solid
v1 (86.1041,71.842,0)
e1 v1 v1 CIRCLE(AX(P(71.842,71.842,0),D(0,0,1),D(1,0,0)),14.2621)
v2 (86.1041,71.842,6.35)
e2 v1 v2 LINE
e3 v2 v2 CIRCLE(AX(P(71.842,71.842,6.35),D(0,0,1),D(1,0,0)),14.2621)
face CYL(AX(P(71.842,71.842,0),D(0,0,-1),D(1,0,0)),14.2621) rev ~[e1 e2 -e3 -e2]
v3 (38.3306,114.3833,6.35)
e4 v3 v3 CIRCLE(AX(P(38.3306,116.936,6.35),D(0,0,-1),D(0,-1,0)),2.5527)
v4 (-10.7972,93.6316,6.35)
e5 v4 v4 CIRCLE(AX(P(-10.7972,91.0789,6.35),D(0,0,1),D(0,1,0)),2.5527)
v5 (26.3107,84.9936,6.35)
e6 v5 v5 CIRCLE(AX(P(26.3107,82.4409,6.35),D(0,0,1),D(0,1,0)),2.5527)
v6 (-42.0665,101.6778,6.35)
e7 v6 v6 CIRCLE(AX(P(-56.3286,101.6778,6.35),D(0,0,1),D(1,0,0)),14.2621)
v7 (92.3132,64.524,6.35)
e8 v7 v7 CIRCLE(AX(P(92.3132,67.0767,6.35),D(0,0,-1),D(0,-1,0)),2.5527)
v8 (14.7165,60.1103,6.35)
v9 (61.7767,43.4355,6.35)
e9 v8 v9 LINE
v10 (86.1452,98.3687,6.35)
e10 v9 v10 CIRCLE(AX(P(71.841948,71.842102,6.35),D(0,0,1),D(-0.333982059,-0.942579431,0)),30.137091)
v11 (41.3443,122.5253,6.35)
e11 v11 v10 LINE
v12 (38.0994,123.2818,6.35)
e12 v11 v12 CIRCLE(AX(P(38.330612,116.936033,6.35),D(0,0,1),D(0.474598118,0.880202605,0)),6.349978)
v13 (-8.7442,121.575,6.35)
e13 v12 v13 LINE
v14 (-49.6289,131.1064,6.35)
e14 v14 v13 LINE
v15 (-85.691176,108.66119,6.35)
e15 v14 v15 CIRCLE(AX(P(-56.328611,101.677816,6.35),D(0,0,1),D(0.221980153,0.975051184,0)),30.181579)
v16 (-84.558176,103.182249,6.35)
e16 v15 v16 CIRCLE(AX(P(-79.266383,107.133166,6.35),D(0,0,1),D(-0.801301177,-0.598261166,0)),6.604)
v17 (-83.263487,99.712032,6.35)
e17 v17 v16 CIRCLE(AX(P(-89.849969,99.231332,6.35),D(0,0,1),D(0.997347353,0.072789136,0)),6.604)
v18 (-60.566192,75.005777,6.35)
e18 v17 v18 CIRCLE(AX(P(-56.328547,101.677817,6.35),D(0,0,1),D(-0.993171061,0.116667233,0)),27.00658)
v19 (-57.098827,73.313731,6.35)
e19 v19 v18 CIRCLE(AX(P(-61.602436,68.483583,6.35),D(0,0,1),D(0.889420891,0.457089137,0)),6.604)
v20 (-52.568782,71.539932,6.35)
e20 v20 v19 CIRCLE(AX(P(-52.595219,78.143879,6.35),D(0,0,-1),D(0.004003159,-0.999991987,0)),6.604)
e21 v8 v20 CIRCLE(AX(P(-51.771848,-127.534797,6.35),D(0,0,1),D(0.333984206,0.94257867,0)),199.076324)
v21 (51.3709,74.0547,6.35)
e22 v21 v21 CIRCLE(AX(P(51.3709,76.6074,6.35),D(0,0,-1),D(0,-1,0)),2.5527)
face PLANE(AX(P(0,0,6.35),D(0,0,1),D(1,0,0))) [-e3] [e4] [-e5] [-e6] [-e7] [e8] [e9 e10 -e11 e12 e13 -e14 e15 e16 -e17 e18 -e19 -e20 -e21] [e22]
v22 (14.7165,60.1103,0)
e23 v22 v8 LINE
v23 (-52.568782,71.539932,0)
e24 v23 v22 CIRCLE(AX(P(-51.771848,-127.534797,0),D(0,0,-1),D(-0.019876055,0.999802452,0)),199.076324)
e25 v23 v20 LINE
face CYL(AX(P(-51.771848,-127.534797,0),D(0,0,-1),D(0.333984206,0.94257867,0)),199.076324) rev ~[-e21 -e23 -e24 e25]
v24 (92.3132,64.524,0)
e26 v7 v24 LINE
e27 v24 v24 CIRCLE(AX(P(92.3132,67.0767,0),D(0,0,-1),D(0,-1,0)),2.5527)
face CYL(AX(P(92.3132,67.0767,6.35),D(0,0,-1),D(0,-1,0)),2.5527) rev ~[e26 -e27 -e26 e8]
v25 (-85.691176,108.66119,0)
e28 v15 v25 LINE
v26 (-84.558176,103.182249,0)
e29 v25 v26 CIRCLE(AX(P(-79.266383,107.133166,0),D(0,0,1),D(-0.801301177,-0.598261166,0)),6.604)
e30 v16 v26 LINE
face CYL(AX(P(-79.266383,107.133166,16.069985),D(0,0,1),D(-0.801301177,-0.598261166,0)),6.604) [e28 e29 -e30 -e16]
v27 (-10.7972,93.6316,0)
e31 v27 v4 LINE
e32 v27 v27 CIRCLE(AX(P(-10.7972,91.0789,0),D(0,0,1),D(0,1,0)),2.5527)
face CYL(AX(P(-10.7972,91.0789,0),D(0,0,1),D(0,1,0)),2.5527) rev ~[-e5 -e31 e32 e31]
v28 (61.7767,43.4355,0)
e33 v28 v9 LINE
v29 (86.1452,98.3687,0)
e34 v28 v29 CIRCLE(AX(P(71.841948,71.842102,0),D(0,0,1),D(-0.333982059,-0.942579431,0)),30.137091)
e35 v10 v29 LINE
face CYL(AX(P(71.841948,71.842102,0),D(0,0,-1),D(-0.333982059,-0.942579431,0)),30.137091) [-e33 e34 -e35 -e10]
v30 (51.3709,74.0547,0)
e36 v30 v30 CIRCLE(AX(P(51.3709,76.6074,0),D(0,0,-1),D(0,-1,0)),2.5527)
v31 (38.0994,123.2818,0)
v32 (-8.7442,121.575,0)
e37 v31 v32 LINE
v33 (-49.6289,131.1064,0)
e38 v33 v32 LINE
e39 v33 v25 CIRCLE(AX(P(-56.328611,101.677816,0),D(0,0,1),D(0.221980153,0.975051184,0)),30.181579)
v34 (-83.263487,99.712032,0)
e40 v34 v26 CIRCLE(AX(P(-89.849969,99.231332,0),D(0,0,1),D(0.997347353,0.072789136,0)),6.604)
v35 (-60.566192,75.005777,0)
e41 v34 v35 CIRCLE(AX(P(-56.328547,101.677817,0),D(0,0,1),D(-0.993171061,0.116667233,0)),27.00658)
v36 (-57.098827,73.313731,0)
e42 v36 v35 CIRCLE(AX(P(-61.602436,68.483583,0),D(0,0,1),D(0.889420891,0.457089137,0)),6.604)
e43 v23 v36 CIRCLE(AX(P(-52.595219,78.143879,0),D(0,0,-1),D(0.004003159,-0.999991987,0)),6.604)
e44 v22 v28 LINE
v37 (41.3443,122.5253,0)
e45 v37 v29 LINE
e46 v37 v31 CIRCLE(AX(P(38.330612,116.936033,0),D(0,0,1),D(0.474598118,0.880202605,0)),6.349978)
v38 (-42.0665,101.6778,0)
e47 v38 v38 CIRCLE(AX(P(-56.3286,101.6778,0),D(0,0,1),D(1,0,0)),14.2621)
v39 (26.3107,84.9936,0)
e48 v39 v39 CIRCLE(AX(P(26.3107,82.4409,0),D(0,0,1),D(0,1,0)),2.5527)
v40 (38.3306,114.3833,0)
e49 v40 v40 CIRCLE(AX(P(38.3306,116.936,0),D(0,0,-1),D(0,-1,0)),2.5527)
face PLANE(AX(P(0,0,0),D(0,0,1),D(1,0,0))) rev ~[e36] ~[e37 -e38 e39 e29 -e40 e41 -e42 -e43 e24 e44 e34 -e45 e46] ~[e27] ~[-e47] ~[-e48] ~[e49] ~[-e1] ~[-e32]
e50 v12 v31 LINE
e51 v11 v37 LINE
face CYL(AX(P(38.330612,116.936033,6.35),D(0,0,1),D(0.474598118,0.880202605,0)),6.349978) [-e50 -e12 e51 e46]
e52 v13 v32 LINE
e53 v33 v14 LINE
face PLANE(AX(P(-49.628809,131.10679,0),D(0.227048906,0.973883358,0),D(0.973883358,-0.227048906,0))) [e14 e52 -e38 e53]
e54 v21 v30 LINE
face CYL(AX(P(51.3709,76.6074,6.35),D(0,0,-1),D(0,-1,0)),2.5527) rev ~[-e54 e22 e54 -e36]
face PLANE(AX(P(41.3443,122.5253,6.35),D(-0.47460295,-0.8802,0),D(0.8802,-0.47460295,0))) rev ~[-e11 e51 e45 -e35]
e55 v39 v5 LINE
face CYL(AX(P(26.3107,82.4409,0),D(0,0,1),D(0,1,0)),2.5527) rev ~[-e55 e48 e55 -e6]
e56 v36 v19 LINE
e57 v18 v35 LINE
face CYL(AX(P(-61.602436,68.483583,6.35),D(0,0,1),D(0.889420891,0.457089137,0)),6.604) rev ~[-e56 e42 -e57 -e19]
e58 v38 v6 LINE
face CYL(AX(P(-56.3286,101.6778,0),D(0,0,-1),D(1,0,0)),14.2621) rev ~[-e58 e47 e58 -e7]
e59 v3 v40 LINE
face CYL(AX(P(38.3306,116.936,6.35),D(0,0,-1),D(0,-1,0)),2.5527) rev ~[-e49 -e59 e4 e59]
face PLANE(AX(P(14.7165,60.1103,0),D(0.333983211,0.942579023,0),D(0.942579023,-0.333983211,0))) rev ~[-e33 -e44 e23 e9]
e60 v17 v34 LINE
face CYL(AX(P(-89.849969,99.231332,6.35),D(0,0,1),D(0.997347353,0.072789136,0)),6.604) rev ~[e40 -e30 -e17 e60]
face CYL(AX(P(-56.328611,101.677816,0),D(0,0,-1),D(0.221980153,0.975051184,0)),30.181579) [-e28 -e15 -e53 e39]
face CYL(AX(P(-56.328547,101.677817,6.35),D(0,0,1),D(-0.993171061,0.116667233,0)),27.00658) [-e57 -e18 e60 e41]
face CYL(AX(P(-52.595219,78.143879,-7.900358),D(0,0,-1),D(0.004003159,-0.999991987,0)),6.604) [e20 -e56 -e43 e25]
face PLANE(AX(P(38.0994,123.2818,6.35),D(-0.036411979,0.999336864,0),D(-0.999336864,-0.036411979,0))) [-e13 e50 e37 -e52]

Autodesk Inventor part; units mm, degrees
ref_plane "YZ Plane" through (0, 0, 0) normal (1, 0, 0) x (0, 1, 0)
ref_plane "XZ Plane" through (0, 0, 0) normal (0, 1, 0) x (-1, 0, 0)
ref_plane "XY Plane" through (0, 0, 0) normal (0, 0, 1) x (1, 0, 0)
sketch "Sketch1" plane through (0, 0, 0) normal (0, 0, 1) x (1, 0, 0)
  circle A0 centre (71.842, 71.842) radius 50.8 construction
  circle A1 centre (-71.842, -71.842) radius 50.8 construction
  circle A2 centre (0, 0) radius 50.8 construction
  line L0 (-35.921, -35.921) -> (35.921, 35.921) construction
  line L1 (71.842, 71.842) -> (-71.842, -71.842) construction
  line L2 (-4.3707, 6.2419) -> (-4.3707, 50.6116) construction
  line L3 (-226.8798, -122.642) -> (638.5123, -122.642) construction
  circle A3 centre (147.8406, -65.492) radius 57.15 construction
  circle A4 centre (71.842, 71.842) radius 14.2621
  circle A5 centre (-71.842, -71.842) radius 14.2621
  circle A6 centre (-4.3707, 6.2419) radius 57.15 construction
  circle A7 centre (-71.842, -71.842) radius 30.1371 construction
  circle A8 centre (71.842, 71.842) radius 30.1371 construction
  circle A9 centre (-56.3286, 101.6778) radius 14.2621
  line L4 (-56.3286, 101.6778) -> (71.842, 71.842) construction
  circle A10 centre (71.842, 71.842) radius 14.3256 construction
  circle A11 centre (-71.842, -71.842) radius 14.3256 construction
  circle A12 centre (-78.675, 59.5778) radius 14.2621
  line L5 (-71.842, -71.842) -> (-78.675, 59.5778) construction
  circle A13 centre (-78.675, 59.5778) radius 23.8316 construction
  circle A14 centre (-56.3286, 101.6778) radius 23.8316 construction
  line L6 (14.7165, 60.1103) -> (61.7767, 43.4355)
  line L7 (-43.0113, -63.0652) -> (-59.0434, -10.4018)
  arc A15 (14.7165, 60.1103) -> (-59.0434, -10.4018) centre (-4.3707, 6.2419) ccw
  line L8 (-202.9564, 165.4321) -> (-177.9423, 161.0215)
  line L9 (-177.9423, 161.0215) -> (-204.4062, 10.9368) construction
  line L10 (-204.4062, 10.9368) -> (-229.4204, 15.3474) construction
  line L11 (-229.4204, 15.3474) -> (-202.9564, 165.4321) construction
  line L12 (-248.4004, -92.2937) -> (35.0702, -142.2772) construction
  line L13 (-201.8537, 171.6857) -> (161.0026, 107.7043) construction
  line L14 (-201.8537, 171.6857) -> (-248.4004, -92.2937) construction
  circle A16 centre (-147.7392, 94.6182) radius 31.75 construction
  line L15 (-77.4376, 35.7784) -> (-74.4797, -21.1106) construction
  line L16 (-190.4493, 163.2268) -> (-216.9133, 13.1421) construction
  line L17 (-193.206, 147.593) -> (-214.1566, 28.7759) construction
  circle A17 centre (-147.7392, 94.6182) radius 17.4625 construction
  circle A18 centre (-147.7392, 94.6182) radius 9.525
  circle A19 centre (-56.3286, 101.6778) radius 30.1816 construction
  line L18 (-202.9564, 165.4321) -> (-229.4204, 15.3474)
  arc A20 (61.7767, 43.4355) -> (78.6846, 101.1921) centre (71.842, 71.842) ccw
  arc A21 (-99.1524, -84.5852) -> (-43.0113, -63.0652) centre (-71.842, -71.842) ccw
  line L19 (-147.7392, 94.6182) -> (-131.3298, 100.5908) construction
  line L20 (-113.4287, 107.1063) -> (-182.0497, 82.1302) construction
  circle A22 centre (-182.0497, 82.1302) radius 4.7625 construction
  line L21 (0, 0) -> (-4.3707, 6.2419) construction
  circle A23 centre (71.842, 71.842) radius 28.6512 construction
  line L22 (62.334, 44.8145) -> (-61.0615, 88.2239) construction
  line L23 (75.2477, 100.2901) -> (-54.6333, 115.8388) construction
  line L24 (-177.9423, 161.0215) -> (78.6846, 101.1921)
  line L25 (-147.7392, 94.6182) -> (-125.7265, 22.8485) construction
  circle A24 centre (-125.7265, 22.8485) radius 31.75 construction
  circle A25 centre (-125.7265, 22.8485) radius 14.2621
  line L26 (-78.675, 59.5778) -> (-125.7265, 22.8485) construction
  circle A26 centre (-147.7392, 94.6182) radius 25.4 construction
  arc A27 (-99.1524, -84.5852) -> (-229.4204, 15.3474) centre (-260.2996, -159.7777) ccw
  circle A28 centre (-147.7392, 94.6182) radius 36.5125 construction
  line L27 (-180.8308, 110.0491) -> (-147.7392, 94.6182) construction
  arc A29 (-39.1085, 126.4648) -> (-49.6289, 131.1064) centre (-56.3286, 101.6778) ccw
  arc A30 (-38.1634, 52.3307) -> (-39.1085, 126.4648) centre (-65.0941, 89.0604) ccw
  arc A31 (14.7165, 60.1103) -> (-55.7287, 71.5022) centre (-51.7719, -127.535) ccw
  arc A32 (-49.6289, 131.1064) -> (-55.7287, 71.5022) centre (-56.3286, 101.6778) ccw
  line L28 (-10.7972, 91.0789) -> (26.3107, 82.4409) construction
  point P0 (-75.9587, 7.3339)
  point P1 (-203.6813, 88.1845)
  point P2 (-203.6813, 88.1845)
  point P3 (-144.7069, 111.8154)
  point P4 (-161.1163, 105.8429)
  point P5 (-164.1486, 88.6457)
  point P6 (-150.7715, 77.421)
  point P7 (-134.3622, 83.3936)
  point P8 (-123.871, 103.3056)
  point P9 (-143.3285, 119.6324)
  point P10 (-167.1967, 110.945)
  point P11 (-171.6074, 85.9309)
  point P12 (-152.1499, 69.6041)
  point P13 (-128.2817, 78.2914)
  point P14 (-160.2272, 128.9288)
  point P15 (-182.0497, 82.1302)
  point P16 (-135.2512, 60.3077)
  point P17 (-132.3084, 127.7098)
  point P18 (-163.1701, 61.5267)
  point P19 (-114.6476, 79.1874)
  point P20 (-49.4759, 131.0711)
  point P21 (7.7567, 86.7599)
  dimension "d7" = 101.6
  dimension "d18" = 47.6631
  dimension "d34" = 34.925
  dimension "d65" = 50.8
  dimension "d3" = 45
  dimension "d4" = 0
  dimension "d8" = 101.6
  dimension "d9" = 28.5242
  dimension "d10" = 101.6
  dimension "d11" = 114.3
  dimension "d12" = 114.3
  dimension "d13" = 15.875
  dimension "d14" = 15.875
  dimension "d15" = 131.5974
  dimension "d16" = 28.6512
  dimension "d17" = 131.5974
  dimension "d19" = 47.6631
  dimension "d22" = 25.4
  dimension "d23" = 152.4
  dimension "d26" = 268.0517
  dimension "d27" = 63.5
  dimension "d30" = 203.2
  dimension "d31" = 10
  dimension "d33" = 120.65
  dimension "d35" = 19.05
  dimension "d36" = 6.35
  dimension "d40" = 360
  dimension "d44" = 9.525
  dimension "d55" = 80
  dimension "d56" = 7.62
  dimension "d57" = 6.35
  dimension "d58" = 57.3024
  dimension "d59" = 63.5
  dimension "d60" = 75.0697
  dimension "d61" = 59.69
  dimension "d62" = 55
  dimension "d68" = 360
  dimension "d70" = 41.275
  dimension "d71" = 60
  dimension "d82" = 360
  dimension "d87" = 360
  dimension "d89" = 45
  dimension "d105" = 38.1
extrude "Extrusion1" add sketch "Sketch1" along normal blind 6.35 contours A29 A30 A31 A32 | A31 A30 A29 L24 A20 L6
hole "Hole1" at (-193.206, 147.593, 0) at (-203.6813, 88.1845, 0) at (-214.1566, 28.7759, 0) at (-131.3298, 100.5908, 0) at (-144.7069, 111.8154, 0) at (-161.1163, 105.8429, 0) at (-164.1486, 88.6457, 0) at (-150.7715, 77.421, 0) at (-134.3622, 83.3936, 0) at (-113.4287, 107.1063, 0) at (-182.0497, 82.1302, 0) at (-152.1499, 69.6041, 0) at (-171.6074, 85.9309, 0) at (-167.1967, 110.945, 0) at (-143.3285, 119.6324, 0) at (-123.871, 103.3056, 0) at (-128.2817, 78.2914, 0) at (-75.9587, 7.3339, 0) at (-180.8308, 110.0491, 0) at (-132.3084, 127.7098, 0) at (-114.6476, 79.1874, 0) at (-163.1701, 61.5267, 0) at (-10.7972, 91.0789, 0) at (26.3107, 82.4409, 0) direction (0, 0, 1) diameter 5.1054 end through all clearance for "Flat Head Machine Screw (82)" size "#10" standard "Ansi Unified Screw Threads"
sketch "Sketch2" plane through (0, 0, 6.35) normal (0, 0, 1) x (1, 0, 0)
  line L0 (78.6846, 101.1921) -> (-49.4759, 131.0711) construction
  circle A0 centre (-56.3286, 101.6778) radius 14.2621 construction
  line L1 (-76.7997, 106.4431) -> (-35.8574, 96.9125) construction
  line L2 (51.3709, 76.6074) -> (92.3132, 67.0767) construction
  line L3 (-56.3286, 101.6778) -> (71.842, 71.842) construction
  arc A1 (-49.4759, 131.0711) -> (-55.7287, 71.5022) centre (-56.3286, 101.6778) ccw projected
  arc A2 (14.7165, 60.1103) -> (-55.7287, 71.5022) centre (-51.7719, -127.535) ccw projected
  line L4 (14.7165, 60.1103) -> (61.7767, 43.4355) projected
  arc A3 (61.7767, 43.4355) -> (78.6846, 101.1921) centre (71.842, 71.842) ccw projected
  point P0 (0, 0)
hole "Hole2" at (92.3132, 67.0767, 6.35) at (51.3709, 76.6074, 6.35) direction (0, 0, -1) diameter 5.1054 end through all clearance for "Flat Head Machine Screw (82)" size "#10" standard "Ansi Unified Screw Threads"
sketch "Sketch3" plane through (0, 0, 6.35) normal (0, 0, 1) x (1, 0, 0)
  circle A0 centre (92.3132, 67.0767) radius 2.5527 construction
  circle A1 centre (51.3709, 76.6074) radius 2.5527 construction
  arc A2 (14.7165, 60.1103) -> (-55.7287, 71.5022) centre (-51.7719, -127.535) ccw construction
  line L0 (14.7165, 60.1103) -> (61.7767, 43.4355) construction
  arc A3 (61.7767, 43.4355) -> (78.6846, 101.1921) centre (71.842, 71.842) ccw construction
  line L1 (78.6846, 101.1921) -> (-49.4759, 131.0711) construction
  arc A4 (-49.4759, 131.0711) -> (-55.7287, 71.5022) centre (-56.3286, 101.6778) ccw construction
  circle A5 centre (71.842, 71.842) radius 14.2621 construction
  circle A6 centre (-56.3286, 101.6778) radius 14.2621 construction
  circle A7 centre (71.842, 71.842) radius 14.2621 construction
  line L2 (-56.3286, 101.6778) -> (71.842, 71.842) construction
  line L3 (30.0957, 81.5598) -> (38.3306, 116.936) construction
  line L4 (41.3443, 122.5253) -> (86.1452, 98.3687)
  arc A8 (61.7767, 43.4355) -> (78.6846, 101.1921) centre (71.842, 71.842) ccw construction
  line L5 (78.6846, 101.1921) -> (-49.4759, 131.0711) construction
  arc A9 (86.1452, 98.3687) -> (78.6846, 101.1921) centre (71.842, 71.842) ccw
  arc A10 (41.3443, 122.5253) -> (38.0994, 123.2818) centre (38.3306, 116.936) ccw
  arc A11 (36.8909, 110.7514) -> (36.9386, 110.7405) centre (38.3306, 116.936) ccw
  line L6 (38.0994, 123.2818) -> (-8.7442, 121.575)
  line L7 (78.6846, 101.1921) -> (-8.7442, 121.575)
  point P0 (0, 0)
  dimension "d90" = 42.8625
  dimension "d91" = 36.322
  dimension "d102" = 6.35
  dimension "d103" = 15.21
  dimension "d104" = 15.21
extrude "Extrusion2" add sketch "Sketch3" against normal up to surface (6.35 mm away)
sketch "Sketch4" plane through (0, 0, 6.35) normal (0, 0, 1) x (1, 0, 0)
  arc A0 (41.3443, 122.5253) -> (38.0994, 123.2818) centre (38.3306, 116.936) ccw construction
  point P0 (0, 0)
hole "Hole3" at (38.3306, 116.936, 6.35) direction (0, 0, -1) diameter 5.1054 end through all clearance for "Flat Head Machine Screw (82)" size "#10" standard "Ansi Unified Screw Threads"
sketch "Sketch5" plane through (0, 0, 6.35) normal (0, 0, 1) x (1, 0, 0)
  circle A0 centre (38.3306, 116.936) radius 2.5527 construction
  circle A1 centre (92.3132, 67.0767) radius 2.5527 construction
  circle A2 centre (51.3709, 76.6074) radius 2.5527 construction
  circle A3 centre (-10.7972, 91.0789) radius 2.5527 construction
  circle A4 centre (26.3107, 82.4409) radius 2.5527 construction
  arc A5 (14.7165, 60.1103) -> (-55.7287, 71.5022) centre (-51.7719, -127.535) ccw construction
  line L0 (14.7165, 60.1103) -> (61.7767, 43.4355) construction
  arc A6 (61.7767, 43.4355) -> (86.1452, 98.3687) centre (71.842, 71.842) ccw construction
  line L1 (86.1452, 98.3687) -> (41.3443, 122.5253) construction
  arc A7 (41.3443, 122.5253) -> (38.0994, 123.2818) centre (38.3306, 116.936) ccw construction
  line L2 (38.0994, 123.2818) -> (-8.7442, 121.575) construction
  line L3 (-8.7442, 121.575) -> (-49.4759, 131.0711) construction
  arc A8 (-49.4759, 131.0711) -> (-55.7287, 71.5022) centre (-56.3286, 101.6778) ccw projected
  circle A9 centre (71.842, 71.842) radius 14.2621 construction
  circle A10 centre (-56.3286, 101.6778) radius 14.2621 construction
  arc A11 (-49.4759, 131.0711) -> (-55.7287, 71.5022) centre (-56.3286, 101.6778) ccw construction
  line L4 (-86.3452, 104.8286) -> (-83.1507, 104.8286)
  arc A12 (14.7165, 60.1103) -> (-55.7287, 71.5022) centre (-51.7719, -127.535) ccw construction
  line L5 (-55.7287, 71.5022) -> (-55.7287, 74.6779)
  arc A13 (-83.1507, 104.8286) -> (-55.7287, 74.6779) centre (-56.3286, 101.6778) ccw
  point P0 (0, 0)
  dimension "d114" = 3.175
extrude "Extrusion3" cut sketch "Sketch5" against normal through all
fillet "Fillet1" radius 6.604 4 edges at (-83.1507, 104.8286, 3.175) (-86.3452, 104.8286, 3.175) (-55.7287, 74.6779, 3.175) (-55.7287, 71.5022, 3.175)
properties part number "GP10-002" material "Polycarbonate, Smoke"
